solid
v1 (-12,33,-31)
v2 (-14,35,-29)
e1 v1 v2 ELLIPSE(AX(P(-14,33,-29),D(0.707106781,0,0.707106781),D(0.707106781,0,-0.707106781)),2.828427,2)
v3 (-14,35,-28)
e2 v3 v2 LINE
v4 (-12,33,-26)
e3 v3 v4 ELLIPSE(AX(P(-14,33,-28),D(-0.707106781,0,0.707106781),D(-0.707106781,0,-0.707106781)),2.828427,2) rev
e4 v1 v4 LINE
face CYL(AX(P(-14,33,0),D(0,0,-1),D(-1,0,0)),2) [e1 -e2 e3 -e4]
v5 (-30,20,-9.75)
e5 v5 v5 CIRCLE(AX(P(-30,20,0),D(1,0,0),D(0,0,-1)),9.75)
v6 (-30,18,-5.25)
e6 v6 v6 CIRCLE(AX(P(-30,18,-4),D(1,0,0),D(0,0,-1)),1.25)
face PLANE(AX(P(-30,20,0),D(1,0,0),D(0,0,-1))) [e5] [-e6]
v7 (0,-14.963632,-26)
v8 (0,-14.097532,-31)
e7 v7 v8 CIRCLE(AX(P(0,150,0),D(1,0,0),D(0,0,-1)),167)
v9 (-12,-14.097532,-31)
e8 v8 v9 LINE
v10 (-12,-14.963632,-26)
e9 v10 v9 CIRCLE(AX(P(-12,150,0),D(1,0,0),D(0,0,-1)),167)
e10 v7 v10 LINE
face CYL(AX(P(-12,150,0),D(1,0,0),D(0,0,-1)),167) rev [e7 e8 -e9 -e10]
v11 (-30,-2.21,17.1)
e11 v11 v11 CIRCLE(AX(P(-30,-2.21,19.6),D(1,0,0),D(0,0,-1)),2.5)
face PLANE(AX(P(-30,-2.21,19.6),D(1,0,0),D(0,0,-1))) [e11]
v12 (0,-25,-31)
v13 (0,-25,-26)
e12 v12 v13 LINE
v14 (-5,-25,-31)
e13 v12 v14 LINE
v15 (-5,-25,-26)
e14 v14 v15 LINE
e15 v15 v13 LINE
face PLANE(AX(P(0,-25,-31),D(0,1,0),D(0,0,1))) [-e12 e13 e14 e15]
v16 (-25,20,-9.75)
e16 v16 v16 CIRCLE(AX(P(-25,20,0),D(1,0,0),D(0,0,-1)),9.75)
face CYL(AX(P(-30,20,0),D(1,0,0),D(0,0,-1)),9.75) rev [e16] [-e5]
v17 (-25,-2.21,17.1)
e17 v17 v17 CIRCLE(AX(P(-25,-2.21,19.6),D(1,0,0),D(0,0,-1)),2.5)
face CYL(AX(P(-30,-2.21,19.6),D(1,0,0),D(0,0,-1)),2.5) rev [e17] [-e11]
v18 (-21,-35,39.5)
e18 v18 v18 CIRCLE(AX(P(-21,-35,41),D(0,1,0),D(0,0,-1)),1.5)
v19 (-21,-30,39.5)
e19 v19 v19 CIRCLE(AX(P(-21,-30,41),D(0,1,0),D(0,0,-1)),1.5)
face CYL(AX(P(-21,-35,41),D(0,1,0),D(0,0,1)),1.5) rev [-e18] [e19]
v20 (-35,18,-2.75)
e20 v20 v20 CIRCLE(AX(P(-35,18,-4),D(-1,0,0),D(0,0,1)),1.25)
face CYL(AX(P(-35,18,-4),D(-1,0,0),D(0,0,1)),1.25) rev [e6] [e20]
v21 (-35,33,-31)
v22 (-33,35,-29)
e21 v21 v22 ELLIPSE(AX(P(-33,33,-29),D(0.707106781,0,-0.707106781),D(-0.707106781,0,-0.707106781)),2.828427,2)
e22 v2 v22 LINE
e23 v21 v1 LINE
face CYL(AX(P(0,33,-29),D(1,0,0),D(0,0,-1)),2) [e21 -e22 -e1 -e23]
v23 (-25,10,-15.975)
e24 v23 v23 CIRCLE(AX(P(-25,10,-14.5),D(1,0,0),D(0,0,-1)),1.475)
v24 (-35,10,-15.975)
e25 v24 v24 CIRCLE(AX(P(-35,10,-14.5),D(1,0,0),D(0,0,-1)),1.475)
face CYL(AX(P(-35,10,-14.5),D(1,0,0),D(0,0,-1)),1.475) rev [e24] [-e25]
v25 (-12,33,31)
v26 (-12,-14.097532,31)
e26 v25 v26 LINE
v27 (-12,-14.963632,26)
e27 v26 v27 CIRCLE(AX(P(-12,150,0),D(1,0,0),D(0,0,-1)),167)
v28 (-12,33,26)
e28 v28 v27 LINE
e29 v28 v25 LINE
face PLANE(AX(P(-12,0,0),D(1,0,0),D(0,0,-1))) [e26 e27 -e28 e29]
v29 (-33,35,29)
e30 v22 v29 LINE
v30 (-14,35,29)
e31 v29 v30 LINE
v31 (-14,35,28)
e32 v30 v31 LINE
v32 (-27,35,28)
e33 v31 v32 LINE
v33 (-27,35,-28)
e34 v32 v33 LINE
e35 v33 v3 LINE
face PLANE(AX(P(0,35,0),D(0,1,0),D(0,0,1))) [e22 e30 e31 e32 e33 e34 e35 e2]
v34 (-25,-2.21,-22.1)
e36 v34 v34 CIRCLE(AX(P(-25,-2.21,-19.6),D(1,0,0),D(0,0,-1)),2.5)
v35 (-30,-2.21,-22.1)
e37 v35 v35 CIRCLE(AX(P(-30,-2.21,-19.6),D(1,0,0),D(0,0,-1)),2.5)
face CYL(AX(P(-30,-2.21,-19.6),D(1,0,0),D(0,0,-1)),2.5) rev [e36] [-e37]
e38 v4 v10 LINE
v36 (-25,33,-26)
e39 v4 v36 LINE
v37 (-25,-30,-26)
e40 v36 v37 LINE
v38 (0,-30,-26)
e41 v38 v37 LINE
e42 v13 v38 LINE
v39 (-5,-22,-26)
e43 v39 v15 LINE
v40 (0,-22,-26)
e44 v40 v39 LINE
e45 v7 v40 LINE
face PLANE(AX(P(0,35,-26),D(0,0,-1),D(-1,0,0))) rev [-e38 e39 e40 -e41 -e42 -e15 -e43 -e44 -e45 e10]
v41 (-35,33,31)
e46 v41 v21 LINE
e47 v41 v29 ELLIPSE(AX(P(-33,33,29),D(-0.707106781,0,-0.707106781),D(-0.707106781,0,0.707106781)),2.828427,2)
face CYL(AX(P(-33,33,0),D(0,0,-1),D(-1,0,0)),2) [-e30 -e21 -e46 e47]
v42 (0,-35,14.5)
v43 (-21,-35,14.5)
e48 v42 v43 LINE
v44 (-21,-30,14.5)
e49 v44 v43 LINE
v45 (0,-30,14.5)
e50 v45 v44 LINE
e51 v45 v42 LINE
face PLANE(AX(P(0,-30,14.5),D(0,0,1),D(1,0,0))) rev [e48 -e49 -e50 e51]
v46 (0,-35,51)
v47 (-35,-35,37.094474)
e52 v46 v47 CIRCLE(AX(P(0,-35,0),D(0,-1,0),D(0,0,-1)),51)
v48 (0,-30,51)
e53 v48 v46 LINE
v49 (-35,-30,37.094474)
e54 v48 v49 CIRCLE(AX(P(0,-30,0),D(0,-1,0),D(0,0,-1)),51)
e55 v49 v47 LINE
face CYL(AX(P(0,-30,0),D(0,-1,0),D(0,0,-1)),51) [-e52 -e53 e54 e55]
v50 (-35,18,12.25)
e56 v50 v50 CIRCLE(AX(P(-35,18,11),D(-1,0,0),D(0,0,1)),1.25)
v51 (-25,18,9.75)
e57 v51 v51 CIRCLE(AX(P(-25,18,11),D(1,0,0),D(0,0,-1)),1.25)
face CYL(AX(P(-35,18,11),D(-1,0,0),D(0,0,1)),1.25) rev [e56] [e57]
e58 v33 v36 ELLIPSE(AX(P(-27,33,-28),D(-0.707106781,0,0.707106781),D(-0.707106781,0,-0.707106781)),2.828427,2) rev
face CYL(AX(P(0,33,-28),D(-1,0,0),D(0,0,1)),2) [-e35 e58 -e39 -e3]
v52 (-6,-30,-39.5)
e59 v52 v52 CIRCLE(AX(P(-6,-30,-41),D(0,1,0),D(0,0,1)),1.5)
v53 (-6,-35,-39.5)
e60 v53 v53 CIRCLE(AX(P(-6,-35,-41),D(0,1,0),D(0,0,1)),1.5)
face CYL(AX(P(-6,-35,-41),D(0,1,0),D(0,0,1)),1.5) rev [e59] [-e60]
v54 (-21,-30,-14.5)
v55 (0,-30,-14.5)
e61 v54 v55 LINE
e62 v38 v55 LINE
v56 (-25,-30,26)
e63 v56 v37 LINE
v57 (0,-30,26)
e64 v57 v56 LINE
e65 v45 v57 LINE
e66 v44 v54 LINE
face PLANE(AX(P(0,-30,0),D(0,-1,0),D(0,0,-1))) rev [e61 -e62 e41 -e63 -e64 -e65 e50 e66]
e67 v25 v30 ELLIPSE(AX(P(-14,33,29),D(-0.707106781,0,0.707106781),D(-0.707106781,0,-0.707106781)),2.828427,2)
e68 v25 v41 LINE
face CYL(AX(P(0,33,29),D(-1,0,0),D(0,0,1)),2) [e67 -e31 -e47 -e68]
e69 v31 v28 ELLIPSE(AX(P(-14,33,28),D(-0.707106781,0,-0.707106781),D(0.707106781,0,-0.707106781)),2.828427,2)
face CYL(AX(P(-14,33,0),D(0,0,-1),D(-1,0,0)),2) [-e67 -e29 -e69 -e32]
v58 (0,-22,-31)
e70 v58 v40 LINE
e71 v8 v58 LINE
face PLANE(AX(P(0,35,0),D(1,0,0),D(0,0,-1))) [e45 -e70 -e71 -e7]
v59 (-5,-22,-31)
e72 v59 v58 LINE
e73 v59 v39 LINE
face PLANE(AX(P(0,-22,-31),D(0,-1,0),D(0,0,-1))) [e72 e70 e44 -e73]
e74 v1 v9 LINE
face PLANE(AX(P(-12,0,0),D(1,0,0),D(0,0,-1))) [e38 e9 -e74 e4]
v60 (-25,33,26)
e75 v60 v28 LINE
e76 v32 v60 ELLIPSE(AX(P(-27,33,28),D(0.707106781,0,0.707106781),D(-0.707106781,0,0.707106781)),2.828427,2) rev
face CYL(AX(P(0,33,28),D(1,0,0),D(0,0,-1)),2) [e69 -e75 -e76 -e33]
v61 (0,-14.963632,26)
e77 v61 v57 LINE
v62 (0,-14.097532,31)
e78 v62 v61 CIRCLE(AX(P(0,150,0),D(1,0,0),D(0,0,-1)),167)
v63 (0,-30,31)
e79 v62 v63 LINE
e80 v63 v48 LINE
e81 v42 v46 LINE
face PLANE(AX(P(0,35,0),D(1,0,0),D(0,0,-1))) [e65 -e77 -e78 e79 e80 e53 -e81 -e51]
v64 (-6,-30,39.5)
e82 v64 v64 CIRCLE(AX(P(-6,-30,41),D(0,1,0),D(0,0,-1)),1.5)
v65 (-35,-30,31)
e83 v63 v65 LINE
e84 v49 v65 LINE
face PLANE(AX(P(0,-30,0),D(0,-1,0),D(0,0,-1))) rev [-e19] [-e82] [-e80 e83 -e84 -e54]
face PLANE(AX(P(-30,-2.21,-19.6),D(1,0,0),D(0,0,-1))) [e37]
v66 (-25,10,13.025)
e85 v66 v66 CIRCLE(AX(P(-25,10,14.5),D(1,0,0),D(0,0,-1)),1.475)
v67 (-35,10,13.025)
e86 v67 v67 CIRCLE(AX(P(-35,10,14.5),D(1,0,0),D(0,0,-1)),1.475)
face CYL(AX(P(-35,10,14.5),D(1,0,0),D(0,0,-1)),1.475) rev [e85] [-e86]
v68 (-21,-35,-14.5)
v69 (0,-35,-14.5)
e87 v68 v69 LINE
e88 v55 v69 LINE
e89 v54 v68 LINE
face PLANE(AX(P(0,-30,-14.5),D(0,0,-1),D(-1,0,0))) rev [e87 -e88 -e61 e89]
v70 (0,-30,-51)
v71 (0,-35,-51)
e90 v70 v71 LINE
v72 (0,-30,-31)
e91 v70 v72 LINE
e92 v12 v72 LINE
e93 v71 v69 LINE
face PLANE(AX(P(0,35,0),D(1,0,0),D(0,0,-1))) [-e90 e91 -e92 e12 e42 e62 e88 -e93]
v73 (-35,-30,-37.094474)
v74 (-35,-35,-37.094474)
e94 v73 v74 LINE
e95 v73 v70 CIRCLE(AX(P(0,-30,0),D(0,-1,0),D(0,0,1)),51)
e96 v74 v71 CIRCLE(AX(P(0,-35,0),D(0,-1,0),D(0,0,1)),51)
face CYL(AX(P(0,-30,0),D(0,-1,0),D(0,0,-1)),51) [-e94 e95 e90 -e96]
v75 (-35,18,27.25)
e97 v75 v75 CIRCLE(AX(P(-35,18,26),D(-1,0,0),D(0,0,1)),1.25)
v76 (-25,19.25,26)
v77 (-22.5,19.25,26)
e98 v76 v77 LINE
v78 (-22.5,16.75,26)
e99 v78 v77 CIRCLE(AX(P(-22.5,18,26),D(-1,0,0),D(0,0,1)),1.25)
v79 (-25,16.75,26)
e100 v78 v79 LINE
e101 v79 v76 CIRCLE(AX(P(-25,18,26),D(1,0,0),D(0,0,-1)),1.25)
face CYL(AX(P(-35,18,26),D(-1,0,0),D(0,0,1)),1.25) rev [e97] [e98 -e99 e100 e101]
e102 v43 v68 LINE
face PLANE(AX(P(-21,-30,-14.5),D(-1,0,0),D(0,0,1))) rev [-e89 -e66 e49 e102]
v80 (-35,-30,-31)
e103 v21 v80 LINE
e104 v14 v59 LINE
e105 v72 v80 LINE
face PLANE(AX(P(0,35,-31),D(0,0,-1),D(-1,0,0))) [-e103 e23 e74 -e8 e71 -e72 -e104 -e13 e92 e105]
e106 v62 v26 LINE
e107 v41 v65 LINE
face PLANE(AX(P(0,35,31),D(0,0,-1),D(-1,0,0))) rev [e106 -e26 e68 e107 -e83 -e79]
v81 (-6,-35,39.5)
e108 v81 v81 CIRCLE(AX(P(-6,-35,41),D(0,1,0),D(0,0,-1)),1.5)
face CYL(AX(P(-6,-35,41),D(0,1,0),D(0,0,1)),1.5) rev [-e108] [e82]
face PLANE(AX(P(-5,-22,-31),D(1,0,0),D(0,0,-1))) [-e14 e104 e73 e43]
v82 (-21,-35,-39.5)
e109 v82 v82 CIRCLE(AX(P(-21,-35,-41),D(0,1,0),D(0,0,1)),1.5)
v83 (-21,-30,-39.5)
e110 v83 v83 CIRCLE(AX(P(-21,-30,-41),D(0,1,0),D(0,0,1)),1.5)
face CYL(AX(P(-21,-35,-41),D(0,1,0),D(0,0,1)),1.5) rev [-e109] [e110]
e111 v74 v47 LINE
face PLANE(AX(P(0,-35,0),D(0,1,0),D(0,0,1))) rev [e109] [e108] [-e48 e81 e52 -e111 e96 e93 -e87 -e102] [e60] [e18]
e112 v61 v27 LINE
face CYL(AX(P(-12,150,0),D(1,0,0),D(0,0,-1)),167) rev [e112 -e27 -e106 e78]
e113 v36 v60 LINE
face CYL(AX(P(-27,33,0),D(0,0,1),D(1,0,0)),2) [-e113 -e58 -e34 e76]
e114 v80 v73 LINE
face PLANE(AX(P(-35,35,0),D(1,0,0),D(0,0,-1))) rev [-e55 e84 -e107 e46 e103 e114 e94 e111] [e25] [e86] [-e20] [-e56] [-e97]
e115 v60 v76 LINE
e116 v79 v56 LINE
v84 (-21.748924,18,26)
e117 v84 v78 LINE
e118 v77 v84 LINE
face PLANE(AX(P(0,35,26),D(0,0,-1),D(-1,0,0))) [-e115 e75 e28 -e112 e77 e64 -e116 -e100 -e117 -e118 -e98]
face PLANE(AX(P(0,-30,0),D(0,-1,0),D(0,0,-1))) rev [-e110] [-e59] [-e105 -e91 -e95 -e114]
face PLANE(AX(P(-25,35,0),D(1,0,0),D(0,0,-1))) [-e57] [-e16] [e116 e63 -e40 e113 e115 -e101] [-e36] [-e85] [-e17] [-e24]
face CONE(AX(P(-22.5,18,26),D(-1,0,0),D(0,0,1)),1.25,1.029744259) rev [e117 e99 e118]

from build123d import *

# Parameters (mm, degrees)
BOSS_EXTRU_7_DEPTH          = 35
BOSS_EXTRU_8_DEPTH          = 5
ESQUISSE3_R                 = 2.5
ENL_V_MAT_EXTRU_1_DEPTH     = 5
ENL_V_MAT_EXTRU_2_DEPTH     = 12
ESQUISSE6_R                 = 9.75
ENL_V_MAT_EXTRU_3_DEPTH     = 5
CONG_1_R                    = 2
ESQUISSE8_R                 = 1.5
ENL_V_MAT_EXTRU_5_DEPTH     = 90.727364834
TROU_TARAUD_M31_D           = 2.5
TROU_TARAUD_M31_DEPTH       = 12.5
TROU_TARAUD_M31_TIP         = 0.751075774
ENL_V_START                 = -35
ENL_V_MAT_EXTRU_6_OUTLINE_R = 1.475
ENL_V_MAT_EXTRU_6_DEPTH     = 10
ENL_V_MAT_EXTRU_7_DEPTH     = 99.692704898
ENL_V_MAT_EXTRU_8_DEPTH     = 10


# Read off the part's stored shape, not the designer's step: Enlèv. mat.-Extru.6
with BuildPart() as part:
    # Esquisse1 → Boss.-Extru.7 (new, symmetric)
    with BuildSketch(Plane(origin=(0, 0, 0), x_dir=(1, 0, 0), z_dir=(0, 1, 0))):
        Polygon((-35, 31), (-35, -31), (0, -31), (0, -26), (-25, -26), (-25, -22.1), (-25, -17.1), (-25, 17.1), (-25, 22.1), (-25, 26), (0, 26), (0, 31), align=None)
    extrude(amount=BOSS_EXTRU_7_DEPTH, both=True)

    # Esquisse2 → Boss.-Extru.8 (add)
    with BuildSketch(Plane.XZ.offset(35)):
        with BuildLine():
            Line((-35, 37.094473982), (-35, -37.094473982))
            ThreePointArc((-35, -37.094473982), (-18.830584523, -47.396298237), (0, -51))
            Line((0, -51), (0, 51))
            ThreePointArc((0, 51), (-18.830584523, 47.396298237), (-35, 37.094473982))
        make_face()
    extrude(amount=-BOSS_EXTRU_8_DEPTH)

    # Esquisse3 → Enlèv. mat.-Extru.1 (cut)
    with BuildSketch(Plane(origin=(-25, 0, 0), x_dir=(0, 0, -1), z_dir=(1, 0, 0))):
        with Locations((-19.6, -2.21)):
            Circle(ESQUISSE3_R)
        with Locations((19.6, -2.21)):
            Circle(ESQUISSE3_R)
    extrude(amount=-ENL_V_MAT_EXTRU_1_DEPTH, mode=Mode.SUBTRACT)

    # Esquisse5 → Enlèv. mat.-Extru.2 (cut)
    with BuildSketch(Plane(origin=(0, 0, 0), x_dir=(0, 0, -1), z_dir=(1, 0, 0))):
        with BuildLine():
            Line((98.051206934, 14.815086571), (40.674477228, 51.032394683))
            ThreePointArc((40.674477228, 51.032394683), (34.260412481, 48.633219758), (27.706013605, 46.649253461))
            ThreePointArc((27.706013605, 46.649253461), (-0.631861598, 43.001865666), (-28.924683694, 46.983677637))
            ThreePointArc((-28.924683694, 46.983677637), (-34.858411147, 48.837303455), (-40.674477228, 51.032394683))
            Line((-40.674477228, 51.032394683), (-98.051206934, 14.815086571))
            ThreePointArc((-98.051206934, 14.815086571), (-66.125172065, -3.350779651), (-31, -14.097531974))
            Line((-31, -14.097531974), (-31, 35))
            Line((-31, 35), (-26, 35))
            Line((-26, 35), (-26, -14.963632356))
            ThreePointArc((-26, -14.963632356), (0, -17), (26, -14.963632356))
            Line((26, -14.963632356), (26, 35))
            Line((26, 35), (31, 35))
            Line((31, 35), (31, -14.097531974))
            ThreePointArc((31, -14.097531974), (66.125172065, -3.350779651), (98.051206934, 14.815086571))
        make_face()
        with BuildLine():
            ThreePointArc((-31, -14.097531974), (-28.503289853, -14.549574498), (-26, -14.963632356))
            Line((-26, -14.963632356), (-26, 35))
            Line((-26, 35), (-31, 35))
            Line((-31, 35), (-31, -14.097531974))
        make_face()
        with BuildLine():
            ThreePointArc((26, -14.963632356), (28.503289853, -14.549574498), (31, -14.097531974))
            Line((31, -14.097531974), (31, 35))
            Line((31, 35), (26, 35))
            Line((26, 35), (26, -14.963632356))
        make_face()
    extrude(amount=-ENL_V_MAT_EXTRU_2_DEPTH, mode=Mode.SUBTRACT)

    # Esquisse6 → Enlèv. mat.-Extru.3 (cut)
    with BuildSketch(Plane(origin=(-25, 0, 0), x_dir=(0, 0, -1), z_dir=(1, 0, 0))):
        with Locations((0, 20)):
            Circle(ESQUISSE6_R)
    extrude(amount=-ENL_V_MAT_EXTRU_3_DEPTH, mode=Mode.SUBTRACT)

    # Congé1
    cong_1_edges = [part.edges().sort_by_distance(p)[0] for p in [
        (-23.5, 35, 31),
        (-18.5, 35, 26),
        (-25, 35, 0),
        (-18.5, 35, -26),
        (-23.5, 35, -31),
        (-12, 35, -28.5),
        (-12, 35, 28.5),
        (-35, 35, 0),
    ]]
    fillet(cong_1_edges, radius=CONG_1_R)

    # Esquisse8 → Enlèv. mat.-Extru.5 (cut, through all)
    with BuildSketch(Plane(origin=(0, -30, 0), x_dir=(1, 0, 0), z_dir=(0, 1, 0))):
        with Locations(Location((-21, 41, 0), (0, 0, 270))):
            Circle(ESQUISSE8_R)
        with Locations(Location((-6, 41, 0), (0, 0, 270))):
            Circle(ESQUISSE8_R)
        with Locations(Location((-6, -41, 0), (0, 0, 90))):
            Circle(ESQUISSE8_R)
        with Locations(Location((-21, -41, 0), (0, 0, 90))):
            Circle(ESQUISSE8_R)
    extrude(amount=-ENL_V_MAT_EXTRU_5_DEPTH, mode=Mode.SUBTRACT)

    # Trou taraudé M31
    with Locations(Plane(origin=(-35, 18, -4), x_dir=(0, 0, -1), z_dir=(-1, 0, 0))):
        with Locations((0, 0), (-15, 0), (-30, 0)):
            Hole(TROU_TARAUD_M31_D / 2, depth=TROU_TARAUD_M31_DEPTH)
            with Locations((0, 0, -(TROU_TARAUD_M31_DEPTH + TROU_TARAUD_M31_TIP / 2))):  # 118° drill point
                Cone(0, TROU_TARAUD_M31_D / 2, TROU_TARAUD_M31_TIP, mode=Mode.SUBTRACT)

    # Enlèv. mat.-Extru.6 outline → Enlèv. mat.-Extru.6 (cut)
    with BuildSketch(Plane.YZ.offset(ENL_V_START)):
        with Locations((10, -14.5)):
            Circle(ENL_V_MAT_EXTRU_6_OUTLINE_R)
        with Locations((10, 14.5)):
            Circle(ENL_V_MAT_EXTRU_6_OUTLINE_R)
    extrude(amount=ENL_V_MAT_EXTRU_6_DEPTH, mode=Mode.SUBTRACT)

    # Esquisse3D3 → Enlèv. mat.-Extru.7 (cut, through all)
    with BuildSketch(Plane(origin=(0, -30, -14.5), x_dir=(-0.586509812151843, 0, 0.8099421215430211), z_dir=(0, -1, 0))):
        Polygon((0, 0), (12.316706055, 17.008784552), (35.80502758, 0), (23.488321525, -17.008784552), align=None)
    extrude(amount=ENL_V_MAT_EXTRU_7_DEPTH, mode=Mode.SUBTRACT)

    # Esquisse3D4 → Enlèv. mat.-Extru.8 (cut)
    with BuildSketch(Plane(origin=(0, -22, -31), x_dir=(-0.8574929257125444, -0.5144957554275261, 0), z_dir=(0, 0, -1))):
        Polygon((0, 0), (4.287464629, 2.572478777), (5.830951895, 0), (1.543487266, -2.572478777), align=None)
    extrude(amount=-ENL_V_MAT_EXTRU_8_DEPTH, mode=Mode.SUBTRACT)


solid = part.part
